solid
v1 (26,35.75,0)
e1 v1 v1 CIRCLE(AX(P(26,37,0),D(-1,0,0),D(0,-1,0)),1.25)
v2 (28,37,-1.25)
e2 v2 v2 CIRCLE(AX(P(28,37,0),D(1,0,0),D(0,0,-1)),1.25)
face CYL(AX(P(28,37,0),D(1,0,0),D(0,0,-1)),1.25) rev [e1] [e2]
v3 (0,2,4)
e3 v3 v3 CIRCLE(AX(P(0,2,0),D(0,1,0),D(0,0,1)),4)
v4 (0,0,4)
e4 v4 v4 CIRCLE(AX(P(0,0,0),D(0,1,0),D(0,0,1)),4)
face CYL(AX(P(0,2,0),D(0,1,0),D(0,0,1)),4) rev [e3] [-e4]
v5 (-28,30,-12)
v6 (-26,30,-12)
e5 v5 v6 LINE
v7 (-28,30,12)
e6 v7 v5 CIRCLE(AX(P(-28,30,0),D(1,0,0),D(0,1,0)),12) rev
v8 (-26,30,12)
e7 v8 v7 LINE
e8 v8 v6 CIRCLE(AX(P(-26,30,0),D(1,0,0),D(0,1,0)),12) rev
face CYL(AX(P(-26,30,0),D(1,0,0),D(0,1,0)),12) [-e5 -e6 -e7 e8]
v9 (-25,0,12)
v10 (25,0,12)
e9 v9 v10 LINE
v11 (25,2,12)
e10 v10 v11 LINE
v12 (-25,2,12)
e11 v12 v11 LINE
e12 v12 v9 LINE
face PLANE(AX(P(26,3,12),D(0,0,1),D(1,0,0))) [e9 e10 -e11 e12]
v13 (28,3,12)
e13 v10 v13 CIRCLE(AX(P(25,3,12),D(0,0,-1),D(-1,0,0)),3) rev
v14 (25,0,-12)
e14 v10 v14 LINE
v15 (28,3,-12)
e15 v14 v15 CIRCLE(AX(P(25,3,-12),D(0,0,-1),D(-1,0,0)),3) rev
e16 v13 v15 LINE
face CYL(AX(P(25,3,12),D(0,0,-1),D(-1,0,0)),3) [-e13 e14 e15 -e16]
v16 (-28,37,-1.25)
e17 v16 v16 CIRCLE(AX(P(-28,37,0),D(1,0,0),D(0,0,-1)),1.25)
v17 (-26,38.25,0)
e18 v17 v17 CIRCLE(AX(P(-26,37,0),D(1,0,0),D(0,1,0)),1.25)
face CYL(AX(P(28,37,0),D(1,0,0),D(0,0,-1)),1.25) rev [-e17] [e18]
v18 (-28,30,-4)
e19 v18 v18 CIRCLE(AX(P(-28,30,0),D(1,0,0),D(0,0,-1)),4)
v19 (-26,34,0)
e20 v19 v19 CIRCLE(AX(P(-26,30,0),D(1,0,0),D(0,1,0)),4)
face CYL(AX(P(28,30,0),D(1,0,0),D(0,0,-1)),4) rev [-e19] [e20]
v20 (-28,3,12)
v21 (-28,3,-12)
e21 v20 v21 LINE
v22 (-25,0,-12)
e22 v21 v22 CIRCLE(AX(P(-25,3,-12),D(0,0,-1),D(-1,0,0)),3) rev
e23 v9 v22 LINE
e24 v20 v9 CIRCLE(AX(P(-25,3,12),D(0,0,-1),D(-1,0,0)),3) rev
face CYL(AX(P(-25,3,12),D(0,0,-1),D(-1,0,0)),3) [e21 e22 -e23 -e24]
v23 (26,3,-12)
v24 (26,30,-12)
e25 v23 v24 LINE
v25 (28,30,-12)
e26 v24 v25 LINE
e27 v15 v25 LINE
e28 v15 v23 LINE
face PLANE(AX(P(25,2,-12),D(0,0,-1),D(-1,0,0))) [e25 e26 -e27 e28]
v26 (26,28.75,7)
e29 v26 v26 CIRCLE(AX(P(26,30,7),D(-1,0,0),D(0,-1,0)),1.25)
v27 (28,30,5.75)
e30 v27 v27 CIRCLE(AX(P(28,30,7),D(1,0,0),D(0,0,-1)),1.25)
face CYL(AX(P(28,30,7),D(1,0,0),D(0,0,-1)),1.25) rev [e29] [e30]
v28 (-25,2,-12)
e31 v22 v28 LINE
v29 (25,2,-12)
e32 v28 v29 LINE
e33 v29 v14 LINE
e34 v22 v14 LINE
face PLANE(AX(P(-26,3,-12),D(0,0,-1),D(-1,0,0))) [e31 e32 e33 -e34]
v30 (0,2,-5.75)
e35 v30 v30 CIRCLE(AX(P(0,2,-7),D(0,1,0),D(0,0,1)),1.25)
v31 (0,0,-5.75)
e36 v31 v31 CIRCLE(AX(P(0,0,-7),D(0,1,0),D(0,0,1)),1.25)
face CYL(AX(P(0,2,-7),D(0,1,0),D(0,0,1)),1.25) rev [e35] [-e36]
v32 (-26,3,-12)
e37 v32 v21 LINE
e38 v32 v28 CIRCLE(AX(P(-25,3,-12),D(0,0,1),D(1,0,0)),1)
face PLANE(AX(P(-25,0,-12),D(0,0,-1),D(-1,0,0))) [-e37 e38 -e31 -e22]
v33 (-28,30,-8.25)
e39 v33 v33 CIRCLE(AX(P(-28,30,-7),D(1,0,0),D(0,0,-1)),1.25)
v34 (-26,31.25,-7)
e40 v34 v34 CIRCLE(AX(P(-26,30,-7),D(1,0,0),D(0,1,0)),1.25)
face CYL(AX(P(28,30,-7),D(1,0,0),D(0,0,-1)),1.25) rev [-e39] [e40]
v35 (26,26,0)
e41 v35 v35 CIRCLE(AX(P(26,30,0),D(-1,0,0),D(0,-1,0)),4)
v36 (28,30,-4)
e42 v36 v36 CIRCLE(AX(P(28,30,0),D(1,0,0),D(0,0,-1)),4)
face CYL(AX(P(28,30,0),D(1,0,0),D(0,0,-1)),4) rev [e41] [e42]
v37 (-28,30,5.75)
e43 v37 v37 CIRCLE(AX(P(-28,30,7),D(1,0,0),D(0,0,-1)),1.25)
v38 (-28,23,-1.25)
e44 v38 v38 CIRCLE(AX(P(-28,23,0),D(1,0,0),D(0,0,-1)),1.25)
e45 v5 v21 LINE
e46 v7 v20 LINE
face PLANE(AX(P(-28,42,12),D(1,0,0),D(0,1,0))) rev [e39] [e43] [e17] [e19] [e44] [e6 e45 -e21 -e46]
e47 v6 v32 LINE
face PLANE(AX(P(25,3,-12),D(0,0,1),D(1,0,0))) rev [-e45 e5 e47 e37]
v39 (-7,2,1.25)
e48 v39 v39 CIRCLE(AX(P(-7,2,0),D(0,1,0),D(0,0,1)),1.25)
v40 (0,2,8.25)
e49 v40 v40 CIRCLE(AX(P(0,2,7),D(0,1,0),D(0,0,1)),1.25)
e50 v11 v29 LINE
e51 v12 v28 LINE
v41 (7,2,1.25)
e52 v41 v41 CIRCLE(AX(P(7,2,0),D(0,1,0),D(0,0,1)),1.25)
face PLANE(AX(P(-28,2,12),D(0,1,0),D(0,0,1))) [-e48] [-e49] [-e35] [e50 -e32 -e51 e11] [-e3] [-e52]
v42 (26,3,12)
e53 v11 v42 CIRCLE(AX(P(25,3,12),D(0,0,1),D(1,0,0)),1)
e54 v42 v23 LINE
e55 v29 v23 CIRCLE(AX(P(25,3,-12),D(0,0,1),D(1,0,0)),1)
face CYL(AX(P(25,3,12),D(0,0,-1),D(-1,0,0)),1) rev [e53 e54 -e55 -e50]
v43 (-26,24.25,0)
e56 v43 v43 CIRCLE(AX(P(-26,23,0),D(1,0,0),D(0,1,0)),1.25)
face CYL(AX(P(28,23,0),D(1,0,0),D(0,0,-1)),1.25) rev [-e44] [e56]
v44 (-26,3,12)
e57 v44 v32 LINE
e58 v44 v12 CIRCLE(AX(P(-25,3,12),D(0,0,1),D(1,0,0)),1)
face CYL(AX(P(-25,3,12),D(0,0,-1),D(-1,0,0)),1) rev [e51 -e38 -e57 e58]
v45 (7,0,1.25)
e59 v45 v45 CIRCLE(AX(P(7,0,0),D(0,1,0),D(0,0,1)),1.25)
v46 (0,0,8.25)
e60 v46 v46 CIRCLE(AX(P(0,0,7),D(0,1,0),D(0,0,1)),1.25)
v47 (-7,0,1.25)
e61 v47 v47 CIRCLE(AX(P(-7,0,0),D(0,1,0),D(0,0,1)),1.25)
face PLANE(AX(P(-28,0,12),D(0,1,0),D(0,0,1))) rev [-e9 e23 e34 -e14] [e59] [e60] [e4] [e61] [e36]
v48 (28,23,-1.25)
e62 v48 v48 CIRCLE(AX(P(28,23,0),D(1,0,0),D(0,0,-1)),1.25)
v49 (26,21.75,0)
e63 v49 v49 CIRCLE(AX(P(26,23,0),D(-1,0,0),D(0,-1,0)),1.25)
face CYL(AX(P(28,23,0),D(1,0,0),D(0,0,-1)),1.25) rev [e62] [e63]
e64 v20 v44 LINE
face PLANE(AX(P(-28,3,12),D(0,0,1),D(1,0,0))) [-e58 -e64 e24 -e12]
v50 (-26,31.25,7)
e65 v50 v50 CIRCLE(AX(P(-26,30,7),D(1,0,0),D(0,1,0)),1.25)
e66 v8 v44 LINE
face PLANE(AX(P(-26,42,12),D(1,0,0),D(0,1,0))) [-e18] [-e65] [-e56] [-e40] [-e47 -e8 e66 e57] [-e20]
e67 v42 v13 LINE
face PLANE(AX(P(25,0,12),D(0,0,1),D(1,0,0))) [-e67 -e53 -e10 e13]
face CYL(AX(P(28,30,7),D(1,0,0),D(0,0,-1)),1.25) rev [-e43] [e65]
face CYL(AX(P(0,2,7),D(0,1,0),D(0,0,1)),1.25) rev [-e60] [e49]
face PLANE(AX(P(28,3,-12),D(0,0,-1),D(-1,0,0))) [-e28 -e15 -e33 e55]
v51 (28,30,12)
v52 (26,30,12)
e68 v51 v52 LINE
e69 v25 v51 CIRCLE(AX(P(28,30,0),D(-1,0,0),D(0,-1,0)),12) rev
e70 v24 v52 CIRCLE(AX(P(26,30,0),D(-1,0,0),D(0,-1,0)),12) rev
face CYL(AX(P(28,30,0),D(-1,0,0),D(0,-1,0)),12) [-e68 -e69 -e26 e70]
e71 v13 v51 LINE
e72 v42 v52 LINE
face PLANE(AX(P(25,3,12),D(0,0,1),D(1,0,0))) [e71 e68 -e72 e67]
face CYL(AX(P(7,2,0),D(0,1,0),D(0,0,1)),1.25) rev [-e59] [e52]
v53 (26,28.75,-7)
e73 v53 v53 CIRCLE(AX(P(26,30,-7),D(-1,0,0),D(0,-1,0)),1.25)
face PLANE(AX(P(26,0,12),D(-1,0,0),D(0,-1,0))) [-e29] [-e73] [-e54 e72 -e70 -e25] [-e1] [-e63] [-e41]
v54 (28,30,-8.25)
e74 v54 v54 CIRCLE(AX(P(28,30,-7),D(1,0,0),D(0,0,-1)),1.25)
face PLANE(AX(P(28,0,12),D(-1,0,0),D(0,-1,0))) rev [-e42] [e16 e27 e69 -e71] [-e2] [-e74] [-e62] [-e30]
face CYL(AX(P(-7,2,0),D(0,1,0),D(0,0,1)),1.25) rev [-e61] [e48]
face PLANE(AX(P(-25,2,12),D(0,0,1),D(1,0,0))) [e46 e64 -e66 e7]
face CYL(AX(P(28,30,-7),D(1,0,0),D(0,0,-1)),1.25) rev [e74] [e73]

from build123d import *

# Parameters (mm, degrees)
T_LE_DE_BASE_PLI_E1_DEPTH       = 12
ENL_V_START                     = -56
ENL_V_MAT_EXTRU_1_DEPTH         = 56
DIAM_TRE_DU_PER_AGE_8_0_8_1_D   = 8
DIAM_TRE_DU_PER_AGE_2_5_2_5_1_D = 2.5
DIAM_TRE_DU_PER_AGE_8_0_8_2_D   = 8
DIAM_TRE_DU_PER_AGE_2_5_2_5_2_D = 2.5


# Read off the part's stored shape, not the designer's step: Enlèv. mat.-Extru.1
# Sheet-metal steps are written as plain solids
with BuildPart() as part:
    # Esquisse1 → Tôle de base pliée1 (new, symmetric)
    with BuildSketch(Plane.XY):
        with BuildLine():
            Line((-28, 42), (-28, 3))
            ThreePointArc((-28, 3), (-27.121320344, 0.878679656), (-25, 0))
            Line((-25, 0), (25, 0))
            ThreePointArc((25, 0), (27.121320344, 0.878679656), (28, 3))
            Line((28, 3), (28, 42))
            Line((28, 42), (26, 42))
            Line((26, 42), (26, 3))
            ThreePointArc((26, 3), (25.707106781, 2.292893219), (25, 2))
            Line((25, 2), (-25, 2))
            ThreePointArc((-25, 2), (-25.707106781, 2.292893219), (-26, 3))
            Line((-26, 3), (-26, 42))
            Line((-26, 42), (-28, 42))
        make_face()
    extrude(amount=T_LE_DE_BASE_PLI_E1_DEPTH, both=True)

    # Enlèv. mat.-Extru.1 outline → Enlèv. mat.-Extru.1 (cut)
    with BuildSketch(Plane(origin=(28, 0, 0), x_dir=(0, 0, -1), z_dir=(1, 0, 0)).offset(ENL_V_START)):
        with BuildLine():
            ThreePointArc((-12, 30), (-8.485281374, 38.485281374), (0, 42))
            Line((0, 42), (-12, 42))
            Line((-12, 42), (-12, 30))
        make_face()
        with BuildLine():
            ThreePointArc((0, 42), (8.485281374, 38.485281374), (12, 30))
            Line((12, 30), (12, 42))
            Line((12, 42), (0, 42))
        make_face()
    extrude(amount=ENL_V_MAT_EXTRU_1_DEPTH, mode=Mode.SUBTRACT)

    # Diamètre du perçage Ø8.0 (8)1 (through all)
    with Locations(Plane(origin=(28, 0, 0), x_dir=(0, 0, -1), z_dir=(1, 0, 0))):
        with Locations((0, 30)):
            Hole(DIAM_TRE_DU_PER_AGE_8_0_8_1_D / 2)

    # Diamètre du perçage Ø2.5 (2.5)1 (through all)
    with Locations(Plane(origin=(28, 0, 0), x_dir=(0, 0, -1), z_dir=(1, 0, 0))):
        with Locations((0, 37), (7, 30), (0, 23), (-7, 30)):
            Hole(DIAM_TRE_DU_PER_AGE_2_5_2_5_1_D / 2)

    # Diamètre du perçage Ø8.0 (8)2 (through all)
    with Locations(Plane(origin=(0, 2, 0), x_dir=(1, 0, 0), z_dir=(0, 1, 0))):
        with Locations((0, 0)):
            Hole(DIAM_TRE_DU_PER_AGE_8_0_8_2_D / 2)

    # Diamètre du perçage Ø2.5 (2.5)2 (through all)
    with Locations(Plane(origin=(0, 2, 0), x_dir=(1, 0, 0), z_dir=(0, 1, 0))):
        with Locations((0, 7), (7, 0), (0, -7), (-7, 0)):
            Hole(DIAM_TRE_DU_PER_AGE_2_5_2_5_2_D / 2)


solid = part.part
